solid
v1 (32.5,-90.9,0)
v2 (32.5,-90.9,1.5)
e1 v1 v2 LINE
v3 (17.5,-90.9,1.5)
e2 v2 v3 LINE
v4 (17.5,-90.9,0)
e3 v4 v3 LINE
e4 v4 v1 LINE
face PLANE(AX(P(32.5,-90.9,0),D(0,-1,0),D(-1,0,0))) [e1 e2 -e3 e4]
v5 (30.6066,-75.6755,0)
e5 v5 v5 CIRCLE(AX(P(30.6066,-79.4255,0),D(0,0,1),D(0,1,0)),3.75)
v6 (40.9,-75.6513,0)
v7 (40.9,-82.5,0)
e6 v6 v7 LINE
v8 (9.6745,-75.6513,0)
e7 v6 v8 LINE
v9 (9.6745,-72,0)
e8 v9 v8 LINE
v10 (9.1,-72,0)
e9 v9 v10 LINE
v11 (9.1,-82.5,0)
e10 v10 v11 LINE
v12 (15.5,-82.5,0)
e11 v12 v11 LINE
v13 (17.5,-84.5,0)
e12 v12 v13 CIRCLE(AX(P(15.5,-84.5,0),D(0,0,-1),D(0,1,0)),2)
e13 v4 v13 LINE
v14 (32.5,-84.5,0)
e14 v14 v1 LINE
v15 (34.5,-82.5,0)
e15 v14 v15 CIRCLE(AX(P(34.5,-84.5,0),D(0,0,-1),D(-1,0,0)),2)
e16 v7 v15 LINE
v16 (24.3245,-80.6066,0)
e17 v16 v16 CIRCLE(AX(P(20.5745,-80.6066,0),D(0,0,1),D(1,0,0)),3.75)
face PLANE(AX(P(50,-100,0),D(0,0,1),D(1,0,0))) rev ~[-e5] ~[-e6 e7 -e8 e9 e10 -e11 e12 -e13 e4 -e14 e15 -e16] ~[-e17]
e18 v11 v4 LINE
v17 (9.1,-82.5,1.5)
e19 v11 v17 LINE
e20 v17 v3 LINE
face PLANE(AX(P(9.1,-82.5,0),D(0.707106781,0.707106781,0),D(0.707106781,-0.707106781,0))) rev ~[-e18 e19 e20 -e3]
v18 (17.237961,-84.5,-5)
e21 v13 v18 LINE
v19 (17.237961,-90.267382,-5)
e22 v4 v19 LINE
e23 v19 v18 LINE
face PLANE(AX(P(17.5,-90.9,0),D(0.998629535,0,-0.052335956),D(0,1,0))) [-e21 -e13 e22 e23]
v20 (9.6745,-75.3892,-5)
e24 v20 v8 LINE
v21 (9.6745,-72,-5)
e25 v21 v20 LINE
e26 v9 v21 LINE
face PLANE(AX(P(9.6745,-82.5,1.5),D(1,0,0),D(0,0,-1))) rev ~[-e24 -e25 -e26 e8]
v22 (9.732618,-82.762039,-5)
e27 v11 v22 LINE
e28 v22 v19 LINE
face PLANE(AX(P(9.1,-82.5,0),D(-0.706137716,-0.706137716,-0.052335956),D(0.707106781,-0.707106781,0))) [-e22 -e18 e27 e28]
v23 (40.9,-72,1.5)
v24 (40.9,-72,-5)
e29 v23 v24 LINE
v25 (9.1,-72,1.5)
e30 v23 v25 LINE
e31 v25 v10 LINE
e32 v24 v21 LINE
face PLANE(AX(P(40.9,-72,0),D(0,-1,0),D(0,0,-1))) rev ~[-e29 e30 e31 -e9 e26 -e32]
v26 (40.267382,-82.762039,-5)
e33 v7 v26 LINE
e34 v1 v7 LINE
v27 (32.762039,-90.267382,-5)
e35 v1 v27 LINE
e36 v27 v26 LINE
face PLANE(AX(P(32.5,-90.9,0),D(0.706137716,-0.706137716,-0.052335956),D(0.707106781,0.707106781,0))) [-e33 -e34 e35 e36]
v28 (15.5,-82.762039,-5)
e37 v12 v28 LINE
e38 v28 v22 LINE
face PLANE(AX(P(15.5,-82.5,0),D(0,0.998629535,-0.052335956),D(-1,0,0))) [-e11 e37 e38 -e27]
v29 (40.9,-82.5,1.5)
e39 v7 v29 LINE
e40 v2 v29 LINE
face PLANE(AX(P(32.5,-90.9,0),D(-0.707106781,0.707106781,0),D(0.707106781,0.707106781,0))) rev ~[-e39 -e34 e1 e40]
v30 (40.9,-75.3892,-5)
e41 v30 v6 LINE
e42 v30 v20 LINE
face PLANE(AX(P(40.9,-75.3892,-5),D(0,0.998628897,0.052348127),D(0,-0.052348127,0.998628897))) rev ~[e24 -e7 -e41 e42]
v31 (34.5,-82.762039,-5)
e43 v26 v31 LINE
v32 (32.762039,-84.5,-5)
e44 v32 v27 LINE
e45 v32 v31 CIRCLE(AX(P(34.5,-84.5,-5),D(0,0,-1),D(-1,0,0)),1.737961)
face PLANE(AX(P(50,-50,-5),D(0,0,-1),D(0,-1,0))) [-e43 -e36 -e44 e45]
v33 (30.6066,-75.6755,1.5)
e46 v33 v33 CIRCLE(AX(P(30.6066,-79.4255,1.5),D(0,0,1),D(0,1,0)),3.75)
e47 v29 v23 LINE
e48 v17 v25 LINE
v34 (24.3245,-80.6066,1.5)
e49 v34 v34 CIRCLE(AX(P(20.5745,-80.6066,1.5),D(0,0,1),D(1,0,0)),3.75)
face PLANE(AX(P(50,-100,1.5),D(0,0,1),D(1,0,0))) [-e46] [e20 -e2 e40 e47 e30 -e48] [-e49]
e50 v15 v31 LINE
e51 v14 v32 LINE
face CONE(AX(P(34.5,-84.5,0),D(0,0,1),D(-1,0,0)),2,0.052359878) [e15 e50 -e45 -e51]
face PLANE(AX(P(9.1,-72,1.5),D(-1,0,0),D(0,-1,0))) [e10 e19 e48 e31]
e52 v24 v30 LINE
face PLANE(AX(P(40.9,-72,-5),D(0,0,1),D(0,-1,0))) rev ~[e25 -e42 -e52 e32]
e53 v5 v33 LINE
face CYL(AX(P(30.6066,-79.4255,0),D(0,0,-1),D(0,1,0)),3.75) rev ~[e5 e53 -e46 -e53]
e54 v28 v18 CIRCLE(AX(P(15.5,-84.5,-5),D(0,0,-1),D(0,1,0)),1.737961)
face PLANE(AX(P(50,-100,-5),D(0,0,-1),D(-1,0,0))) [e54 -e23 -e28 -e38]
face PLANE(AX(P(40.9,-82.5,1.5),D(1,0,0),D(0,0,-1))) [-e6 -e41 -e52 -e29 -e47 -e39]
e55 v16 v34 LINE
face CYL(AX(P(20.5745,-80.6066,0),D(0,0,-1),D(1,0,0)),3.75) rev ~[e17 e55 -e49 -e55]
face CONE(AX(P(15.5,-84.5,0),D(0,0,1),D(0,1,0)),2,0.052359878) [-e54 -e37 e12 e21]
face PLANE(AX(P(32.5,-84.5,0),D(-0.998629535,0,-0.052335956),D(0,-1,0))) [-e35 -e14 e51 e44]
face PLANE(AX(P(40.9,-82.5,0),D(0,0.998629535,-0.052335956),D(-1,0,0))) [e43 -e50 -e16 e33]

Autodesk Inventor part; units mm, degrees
ref_plane "YZ Plane" through (0, 0, 0) normal (1, 0, 0) x (0, 1, 0)
ref_plane "XZ Plane" through (0, 0, 0) normal (0, 1, 0) x (-1, 0, 0)
ref_plane "Work Plane1" through (50, -100, 0) normal (0, 0, 1) x (1, 0, 0)
sketch "Sketch1" plane through (50, -100, 0) normal (0, 0, 1) x (1, 0, 0)
  line L0 (-9.1, 25) -> (-9.1, 17.5) construction
  line L1 (-9.1, 25) -> (-25, 25) construction
  line L2 (-25, 25) -> (-25, 9.1) construction
  line L3 (-17.5, 9.1) -> (-25, 9.1) construction
  line L4 (-17.5, 9.1) -> (-17.5, 15.5) construction
  arc A0 (-15.5, 17.5) -> (-17.5, 15.5) centre (-15.5, 15.5) ccw construction
  line L5 (-15.5, 17.5) -> (-9.1, 17.5) construction
  circle A1 centre (-20, 20) radius 2.2989 construction
  line L6 (-40.9, 17.5) -> (-40.9, 25)
  line L7 (-40.9, 17.5) -> (-34.5, 17.5) construction
  arc A2 (-32.5, 15.5) -> (-34.5, 17.5) centre (-34.5, 15.5) ccw construction
  line L8 (-32.5, 15.5) -> (-32.5, 9.1) construction
  line L9 (-25, 9.1) -> (-32.5, 9.1)
  line L10 (-25, 9.1) -> (-25, 25) construction
  line L11 (-25, 25) -> (-40.9, 25) construction
  circle A3 centre (-30, 20) radius 2.2989 construction
  line L12 (-40.9, 25) -> (-40.9, 32.5) construction
  line L13 (-40.9, 25) -> (-25, 25)
  line L14 (-25, 25) -> (-25, 40.9) construction
  line L15 (-32.5, 40.9) -> (-25, 40.9) construction
  line L16 (-32.5, 40.9) -> (-32.5, 34.5) construction
  arc A4 (-34.5, 32.5) -> (-32.5, 34.5) centre (-34.5, 34.5) ccw construction
  line L17 (-34.5, 32.5) -> (-40.9, 32.5) construction
  circle A5 centre (-30, 30) radius 2.2989 construction
  circle A6 centre (-20, 30) radius 2.2989 construction
  line L18 (-25, 40.9) -> (-17.5, 40.9) construction
  line L19 (-25, 40.9) -> (-25, 25) construction
  line L20 (-25, 25) -> (-9.1, 25) construction
  line L21 (-9.1, 32.5) -> (-9.1, 25) construction
  line L22 (-9.1, 32.5) -> (-15.5, 32.5) construction
  arc A7 (-17.5, 34.5) -> (-15.5, 32.5) centre (-15.5, 34.5) ccw construction
  line L23 (-17.5, 34.5) -> (-17.5, 40.9) construction
  line L24 (-25, 9.1) -> (-32.5, 9.1)
  line L25 (-40.9, 17.5) -> (-32.5, 9.1)
  line L26 (-40.9, 17.5) -> (-40.9, 25)
  line L27 (-25, 25) -> (-40.9, 25)
  line L28 (-25, 9.1) -> (-25, 25)
  arc A8 (-32.5755, 19.3934) -> (-26.2755, 19.3934) centre (-29.4255, 19.3934) ccw projected
  circle A9 centre (-29.4255, 19.3934) radius 3.75
  line L29 (-40.9, 17.5) -> (-40.9, 25) projected
  line L30 (-25, 9.1) -> (-32.5, 9.1) projected
  line L31 (-40.9, 25) -> (-25, 25) projected
  point P0 (-50, 100)
  dimension "d0" = 7.5
extrude "Extrusion1" add sketch "Sketch1" along normal blind 1.5
sketch "Sketch2" plane through (50, -100, 0) normal (0, 0, -1) x (-1, 0, 0)
  circle A0 centre (29.4255, 19.3934) radius 3.75 projected
  line L0 (25, 25) -> (40.9, 25) projected
  line L1 (25, 9.1) -> (25, 25) projected
  line L2 (32.5, 9.1) -> (25, 9.1) projected
  line L3 (40.9, 17.5) -> (32.5, 9.1) projected
  line L4 (40.9, 25) -> (40.9, 17.5) projected
  line L5 (32.5, -15.5) -> (32.5, 15.5) projected
  arc A1 (34.5, 17.5) -> (32.5, 15.5) centre (34.5, 15.5) ccw projected
  line L6 (34.5, 17.5) -> (65.5, 17.5) projected
  line L7 (65.9987, 17.7) -> (34.5, 17.7)
  arc A2 (34.5, 17.7) -> (32.3, 15.5) centre (34.5, 15.5) ccw
  line L8 (32.3, 15.5) -> (32.3, -15.5)
  line L9 (40.9, 17.5) -> (32.5, 9.1) projected
  point P0 (50, 100)
  point P1 (41.1, 17.7)
  point P2 (32.3, 8.9)
  dimension "d9" = 0.2
extrude "Extrusion2" add sketch "Sketch2" along normal blind 5 draft -3 contours L3 L5 A1 L6
pattern_circular "Circular Pattern1" count 2 over 90 about axis through (25, -75, 0) along (0, 0, 1) of "Extrusion1", "Extrusion2"
sketch "Sketch3" plane through (50, -100, 1.5) normal (0, 0, 1) x (1, 0, 0)
  circle A0 centre (-19.3934, 20.5745) radius 3.75 projected
  circle A1 centre (-29.4255, 19.3934) radius 3.75 projected
  line L0 (-9.1, 25) -> (-40.9, 25) projected
  line L1 (-40.9, 25) -> (-40.9, 17.5) projected
  line L2 (-40.9, 17.5) -> (-32.5, 9.1) projected
  line L3 (-32.5, 9.1) -> (-17.5, 9.1) projected
  line L4 (-17.5, 9.1) -> (-9.1, 17.5) projected
  line L5 (-9.1, 17.5) -> (-9.1, 25) projected
  line L6 (-40.9, 25) -> (-9.1, 25)
  line L7 (-9.1, 25) -> (-9.1, 28)
  line L8 (-9.1, 28) -> (-40.9, 28)
  line L9 (-40.9, 28) -> (-40.9, 25)
  point P0 (-50, 100)
  dimension "d10" = 3
ref_plane "Work Plane2" through (25.5745, -91.5066, 0) normal (0, 0, 1) x (1, 0, 0)
extrude "Extrusion3" add sketch "Sketch3" against normal up to surface (1.5 mm away) contours L0 L9 L8 L7
sketch "Sketch4" plane through (40.9, -82.5, 1.5) normal (1, 0, 0) x (0, 0, -1)
  line L0 (1.5, 6.8934) -> (9.5, 6.8934) construction
  line L1 (6.5, -7.7674) -> (6.5, -0.262) projected
  line L2 (1.5, 0) -> (1.5, 10.5) construction
  line L3 (1.5, 10.5) -> (6.5, 10.5) construction
  line L4 (0, 10.5) -> (1.5, 10.5) projected
  line L5 (1.5, 10.5) -> (6.5, 10.5)
  line L6 (1.5, 10.5) -> (1.5, 6.6716)
  line L7 (6.5, 10.5) -> (6.5, 7.1108) construction
  line L8 (6.5, 7.1108) -> (1.5, 6.8487)
  line L9 (1.5, 6.8487) -> (1.5, 10.5)
  line L10 (6.5, 10.5) -> (6.5, 7.1108)
  point P0 (1.5, 82.5)
  dimension "d16" = 93
extrude "Extrusion4" add sketch "Sketch4" against normal up to surface (31.2255 mm away)
properties part number "30_Baseplate_Connector_Clamp"
